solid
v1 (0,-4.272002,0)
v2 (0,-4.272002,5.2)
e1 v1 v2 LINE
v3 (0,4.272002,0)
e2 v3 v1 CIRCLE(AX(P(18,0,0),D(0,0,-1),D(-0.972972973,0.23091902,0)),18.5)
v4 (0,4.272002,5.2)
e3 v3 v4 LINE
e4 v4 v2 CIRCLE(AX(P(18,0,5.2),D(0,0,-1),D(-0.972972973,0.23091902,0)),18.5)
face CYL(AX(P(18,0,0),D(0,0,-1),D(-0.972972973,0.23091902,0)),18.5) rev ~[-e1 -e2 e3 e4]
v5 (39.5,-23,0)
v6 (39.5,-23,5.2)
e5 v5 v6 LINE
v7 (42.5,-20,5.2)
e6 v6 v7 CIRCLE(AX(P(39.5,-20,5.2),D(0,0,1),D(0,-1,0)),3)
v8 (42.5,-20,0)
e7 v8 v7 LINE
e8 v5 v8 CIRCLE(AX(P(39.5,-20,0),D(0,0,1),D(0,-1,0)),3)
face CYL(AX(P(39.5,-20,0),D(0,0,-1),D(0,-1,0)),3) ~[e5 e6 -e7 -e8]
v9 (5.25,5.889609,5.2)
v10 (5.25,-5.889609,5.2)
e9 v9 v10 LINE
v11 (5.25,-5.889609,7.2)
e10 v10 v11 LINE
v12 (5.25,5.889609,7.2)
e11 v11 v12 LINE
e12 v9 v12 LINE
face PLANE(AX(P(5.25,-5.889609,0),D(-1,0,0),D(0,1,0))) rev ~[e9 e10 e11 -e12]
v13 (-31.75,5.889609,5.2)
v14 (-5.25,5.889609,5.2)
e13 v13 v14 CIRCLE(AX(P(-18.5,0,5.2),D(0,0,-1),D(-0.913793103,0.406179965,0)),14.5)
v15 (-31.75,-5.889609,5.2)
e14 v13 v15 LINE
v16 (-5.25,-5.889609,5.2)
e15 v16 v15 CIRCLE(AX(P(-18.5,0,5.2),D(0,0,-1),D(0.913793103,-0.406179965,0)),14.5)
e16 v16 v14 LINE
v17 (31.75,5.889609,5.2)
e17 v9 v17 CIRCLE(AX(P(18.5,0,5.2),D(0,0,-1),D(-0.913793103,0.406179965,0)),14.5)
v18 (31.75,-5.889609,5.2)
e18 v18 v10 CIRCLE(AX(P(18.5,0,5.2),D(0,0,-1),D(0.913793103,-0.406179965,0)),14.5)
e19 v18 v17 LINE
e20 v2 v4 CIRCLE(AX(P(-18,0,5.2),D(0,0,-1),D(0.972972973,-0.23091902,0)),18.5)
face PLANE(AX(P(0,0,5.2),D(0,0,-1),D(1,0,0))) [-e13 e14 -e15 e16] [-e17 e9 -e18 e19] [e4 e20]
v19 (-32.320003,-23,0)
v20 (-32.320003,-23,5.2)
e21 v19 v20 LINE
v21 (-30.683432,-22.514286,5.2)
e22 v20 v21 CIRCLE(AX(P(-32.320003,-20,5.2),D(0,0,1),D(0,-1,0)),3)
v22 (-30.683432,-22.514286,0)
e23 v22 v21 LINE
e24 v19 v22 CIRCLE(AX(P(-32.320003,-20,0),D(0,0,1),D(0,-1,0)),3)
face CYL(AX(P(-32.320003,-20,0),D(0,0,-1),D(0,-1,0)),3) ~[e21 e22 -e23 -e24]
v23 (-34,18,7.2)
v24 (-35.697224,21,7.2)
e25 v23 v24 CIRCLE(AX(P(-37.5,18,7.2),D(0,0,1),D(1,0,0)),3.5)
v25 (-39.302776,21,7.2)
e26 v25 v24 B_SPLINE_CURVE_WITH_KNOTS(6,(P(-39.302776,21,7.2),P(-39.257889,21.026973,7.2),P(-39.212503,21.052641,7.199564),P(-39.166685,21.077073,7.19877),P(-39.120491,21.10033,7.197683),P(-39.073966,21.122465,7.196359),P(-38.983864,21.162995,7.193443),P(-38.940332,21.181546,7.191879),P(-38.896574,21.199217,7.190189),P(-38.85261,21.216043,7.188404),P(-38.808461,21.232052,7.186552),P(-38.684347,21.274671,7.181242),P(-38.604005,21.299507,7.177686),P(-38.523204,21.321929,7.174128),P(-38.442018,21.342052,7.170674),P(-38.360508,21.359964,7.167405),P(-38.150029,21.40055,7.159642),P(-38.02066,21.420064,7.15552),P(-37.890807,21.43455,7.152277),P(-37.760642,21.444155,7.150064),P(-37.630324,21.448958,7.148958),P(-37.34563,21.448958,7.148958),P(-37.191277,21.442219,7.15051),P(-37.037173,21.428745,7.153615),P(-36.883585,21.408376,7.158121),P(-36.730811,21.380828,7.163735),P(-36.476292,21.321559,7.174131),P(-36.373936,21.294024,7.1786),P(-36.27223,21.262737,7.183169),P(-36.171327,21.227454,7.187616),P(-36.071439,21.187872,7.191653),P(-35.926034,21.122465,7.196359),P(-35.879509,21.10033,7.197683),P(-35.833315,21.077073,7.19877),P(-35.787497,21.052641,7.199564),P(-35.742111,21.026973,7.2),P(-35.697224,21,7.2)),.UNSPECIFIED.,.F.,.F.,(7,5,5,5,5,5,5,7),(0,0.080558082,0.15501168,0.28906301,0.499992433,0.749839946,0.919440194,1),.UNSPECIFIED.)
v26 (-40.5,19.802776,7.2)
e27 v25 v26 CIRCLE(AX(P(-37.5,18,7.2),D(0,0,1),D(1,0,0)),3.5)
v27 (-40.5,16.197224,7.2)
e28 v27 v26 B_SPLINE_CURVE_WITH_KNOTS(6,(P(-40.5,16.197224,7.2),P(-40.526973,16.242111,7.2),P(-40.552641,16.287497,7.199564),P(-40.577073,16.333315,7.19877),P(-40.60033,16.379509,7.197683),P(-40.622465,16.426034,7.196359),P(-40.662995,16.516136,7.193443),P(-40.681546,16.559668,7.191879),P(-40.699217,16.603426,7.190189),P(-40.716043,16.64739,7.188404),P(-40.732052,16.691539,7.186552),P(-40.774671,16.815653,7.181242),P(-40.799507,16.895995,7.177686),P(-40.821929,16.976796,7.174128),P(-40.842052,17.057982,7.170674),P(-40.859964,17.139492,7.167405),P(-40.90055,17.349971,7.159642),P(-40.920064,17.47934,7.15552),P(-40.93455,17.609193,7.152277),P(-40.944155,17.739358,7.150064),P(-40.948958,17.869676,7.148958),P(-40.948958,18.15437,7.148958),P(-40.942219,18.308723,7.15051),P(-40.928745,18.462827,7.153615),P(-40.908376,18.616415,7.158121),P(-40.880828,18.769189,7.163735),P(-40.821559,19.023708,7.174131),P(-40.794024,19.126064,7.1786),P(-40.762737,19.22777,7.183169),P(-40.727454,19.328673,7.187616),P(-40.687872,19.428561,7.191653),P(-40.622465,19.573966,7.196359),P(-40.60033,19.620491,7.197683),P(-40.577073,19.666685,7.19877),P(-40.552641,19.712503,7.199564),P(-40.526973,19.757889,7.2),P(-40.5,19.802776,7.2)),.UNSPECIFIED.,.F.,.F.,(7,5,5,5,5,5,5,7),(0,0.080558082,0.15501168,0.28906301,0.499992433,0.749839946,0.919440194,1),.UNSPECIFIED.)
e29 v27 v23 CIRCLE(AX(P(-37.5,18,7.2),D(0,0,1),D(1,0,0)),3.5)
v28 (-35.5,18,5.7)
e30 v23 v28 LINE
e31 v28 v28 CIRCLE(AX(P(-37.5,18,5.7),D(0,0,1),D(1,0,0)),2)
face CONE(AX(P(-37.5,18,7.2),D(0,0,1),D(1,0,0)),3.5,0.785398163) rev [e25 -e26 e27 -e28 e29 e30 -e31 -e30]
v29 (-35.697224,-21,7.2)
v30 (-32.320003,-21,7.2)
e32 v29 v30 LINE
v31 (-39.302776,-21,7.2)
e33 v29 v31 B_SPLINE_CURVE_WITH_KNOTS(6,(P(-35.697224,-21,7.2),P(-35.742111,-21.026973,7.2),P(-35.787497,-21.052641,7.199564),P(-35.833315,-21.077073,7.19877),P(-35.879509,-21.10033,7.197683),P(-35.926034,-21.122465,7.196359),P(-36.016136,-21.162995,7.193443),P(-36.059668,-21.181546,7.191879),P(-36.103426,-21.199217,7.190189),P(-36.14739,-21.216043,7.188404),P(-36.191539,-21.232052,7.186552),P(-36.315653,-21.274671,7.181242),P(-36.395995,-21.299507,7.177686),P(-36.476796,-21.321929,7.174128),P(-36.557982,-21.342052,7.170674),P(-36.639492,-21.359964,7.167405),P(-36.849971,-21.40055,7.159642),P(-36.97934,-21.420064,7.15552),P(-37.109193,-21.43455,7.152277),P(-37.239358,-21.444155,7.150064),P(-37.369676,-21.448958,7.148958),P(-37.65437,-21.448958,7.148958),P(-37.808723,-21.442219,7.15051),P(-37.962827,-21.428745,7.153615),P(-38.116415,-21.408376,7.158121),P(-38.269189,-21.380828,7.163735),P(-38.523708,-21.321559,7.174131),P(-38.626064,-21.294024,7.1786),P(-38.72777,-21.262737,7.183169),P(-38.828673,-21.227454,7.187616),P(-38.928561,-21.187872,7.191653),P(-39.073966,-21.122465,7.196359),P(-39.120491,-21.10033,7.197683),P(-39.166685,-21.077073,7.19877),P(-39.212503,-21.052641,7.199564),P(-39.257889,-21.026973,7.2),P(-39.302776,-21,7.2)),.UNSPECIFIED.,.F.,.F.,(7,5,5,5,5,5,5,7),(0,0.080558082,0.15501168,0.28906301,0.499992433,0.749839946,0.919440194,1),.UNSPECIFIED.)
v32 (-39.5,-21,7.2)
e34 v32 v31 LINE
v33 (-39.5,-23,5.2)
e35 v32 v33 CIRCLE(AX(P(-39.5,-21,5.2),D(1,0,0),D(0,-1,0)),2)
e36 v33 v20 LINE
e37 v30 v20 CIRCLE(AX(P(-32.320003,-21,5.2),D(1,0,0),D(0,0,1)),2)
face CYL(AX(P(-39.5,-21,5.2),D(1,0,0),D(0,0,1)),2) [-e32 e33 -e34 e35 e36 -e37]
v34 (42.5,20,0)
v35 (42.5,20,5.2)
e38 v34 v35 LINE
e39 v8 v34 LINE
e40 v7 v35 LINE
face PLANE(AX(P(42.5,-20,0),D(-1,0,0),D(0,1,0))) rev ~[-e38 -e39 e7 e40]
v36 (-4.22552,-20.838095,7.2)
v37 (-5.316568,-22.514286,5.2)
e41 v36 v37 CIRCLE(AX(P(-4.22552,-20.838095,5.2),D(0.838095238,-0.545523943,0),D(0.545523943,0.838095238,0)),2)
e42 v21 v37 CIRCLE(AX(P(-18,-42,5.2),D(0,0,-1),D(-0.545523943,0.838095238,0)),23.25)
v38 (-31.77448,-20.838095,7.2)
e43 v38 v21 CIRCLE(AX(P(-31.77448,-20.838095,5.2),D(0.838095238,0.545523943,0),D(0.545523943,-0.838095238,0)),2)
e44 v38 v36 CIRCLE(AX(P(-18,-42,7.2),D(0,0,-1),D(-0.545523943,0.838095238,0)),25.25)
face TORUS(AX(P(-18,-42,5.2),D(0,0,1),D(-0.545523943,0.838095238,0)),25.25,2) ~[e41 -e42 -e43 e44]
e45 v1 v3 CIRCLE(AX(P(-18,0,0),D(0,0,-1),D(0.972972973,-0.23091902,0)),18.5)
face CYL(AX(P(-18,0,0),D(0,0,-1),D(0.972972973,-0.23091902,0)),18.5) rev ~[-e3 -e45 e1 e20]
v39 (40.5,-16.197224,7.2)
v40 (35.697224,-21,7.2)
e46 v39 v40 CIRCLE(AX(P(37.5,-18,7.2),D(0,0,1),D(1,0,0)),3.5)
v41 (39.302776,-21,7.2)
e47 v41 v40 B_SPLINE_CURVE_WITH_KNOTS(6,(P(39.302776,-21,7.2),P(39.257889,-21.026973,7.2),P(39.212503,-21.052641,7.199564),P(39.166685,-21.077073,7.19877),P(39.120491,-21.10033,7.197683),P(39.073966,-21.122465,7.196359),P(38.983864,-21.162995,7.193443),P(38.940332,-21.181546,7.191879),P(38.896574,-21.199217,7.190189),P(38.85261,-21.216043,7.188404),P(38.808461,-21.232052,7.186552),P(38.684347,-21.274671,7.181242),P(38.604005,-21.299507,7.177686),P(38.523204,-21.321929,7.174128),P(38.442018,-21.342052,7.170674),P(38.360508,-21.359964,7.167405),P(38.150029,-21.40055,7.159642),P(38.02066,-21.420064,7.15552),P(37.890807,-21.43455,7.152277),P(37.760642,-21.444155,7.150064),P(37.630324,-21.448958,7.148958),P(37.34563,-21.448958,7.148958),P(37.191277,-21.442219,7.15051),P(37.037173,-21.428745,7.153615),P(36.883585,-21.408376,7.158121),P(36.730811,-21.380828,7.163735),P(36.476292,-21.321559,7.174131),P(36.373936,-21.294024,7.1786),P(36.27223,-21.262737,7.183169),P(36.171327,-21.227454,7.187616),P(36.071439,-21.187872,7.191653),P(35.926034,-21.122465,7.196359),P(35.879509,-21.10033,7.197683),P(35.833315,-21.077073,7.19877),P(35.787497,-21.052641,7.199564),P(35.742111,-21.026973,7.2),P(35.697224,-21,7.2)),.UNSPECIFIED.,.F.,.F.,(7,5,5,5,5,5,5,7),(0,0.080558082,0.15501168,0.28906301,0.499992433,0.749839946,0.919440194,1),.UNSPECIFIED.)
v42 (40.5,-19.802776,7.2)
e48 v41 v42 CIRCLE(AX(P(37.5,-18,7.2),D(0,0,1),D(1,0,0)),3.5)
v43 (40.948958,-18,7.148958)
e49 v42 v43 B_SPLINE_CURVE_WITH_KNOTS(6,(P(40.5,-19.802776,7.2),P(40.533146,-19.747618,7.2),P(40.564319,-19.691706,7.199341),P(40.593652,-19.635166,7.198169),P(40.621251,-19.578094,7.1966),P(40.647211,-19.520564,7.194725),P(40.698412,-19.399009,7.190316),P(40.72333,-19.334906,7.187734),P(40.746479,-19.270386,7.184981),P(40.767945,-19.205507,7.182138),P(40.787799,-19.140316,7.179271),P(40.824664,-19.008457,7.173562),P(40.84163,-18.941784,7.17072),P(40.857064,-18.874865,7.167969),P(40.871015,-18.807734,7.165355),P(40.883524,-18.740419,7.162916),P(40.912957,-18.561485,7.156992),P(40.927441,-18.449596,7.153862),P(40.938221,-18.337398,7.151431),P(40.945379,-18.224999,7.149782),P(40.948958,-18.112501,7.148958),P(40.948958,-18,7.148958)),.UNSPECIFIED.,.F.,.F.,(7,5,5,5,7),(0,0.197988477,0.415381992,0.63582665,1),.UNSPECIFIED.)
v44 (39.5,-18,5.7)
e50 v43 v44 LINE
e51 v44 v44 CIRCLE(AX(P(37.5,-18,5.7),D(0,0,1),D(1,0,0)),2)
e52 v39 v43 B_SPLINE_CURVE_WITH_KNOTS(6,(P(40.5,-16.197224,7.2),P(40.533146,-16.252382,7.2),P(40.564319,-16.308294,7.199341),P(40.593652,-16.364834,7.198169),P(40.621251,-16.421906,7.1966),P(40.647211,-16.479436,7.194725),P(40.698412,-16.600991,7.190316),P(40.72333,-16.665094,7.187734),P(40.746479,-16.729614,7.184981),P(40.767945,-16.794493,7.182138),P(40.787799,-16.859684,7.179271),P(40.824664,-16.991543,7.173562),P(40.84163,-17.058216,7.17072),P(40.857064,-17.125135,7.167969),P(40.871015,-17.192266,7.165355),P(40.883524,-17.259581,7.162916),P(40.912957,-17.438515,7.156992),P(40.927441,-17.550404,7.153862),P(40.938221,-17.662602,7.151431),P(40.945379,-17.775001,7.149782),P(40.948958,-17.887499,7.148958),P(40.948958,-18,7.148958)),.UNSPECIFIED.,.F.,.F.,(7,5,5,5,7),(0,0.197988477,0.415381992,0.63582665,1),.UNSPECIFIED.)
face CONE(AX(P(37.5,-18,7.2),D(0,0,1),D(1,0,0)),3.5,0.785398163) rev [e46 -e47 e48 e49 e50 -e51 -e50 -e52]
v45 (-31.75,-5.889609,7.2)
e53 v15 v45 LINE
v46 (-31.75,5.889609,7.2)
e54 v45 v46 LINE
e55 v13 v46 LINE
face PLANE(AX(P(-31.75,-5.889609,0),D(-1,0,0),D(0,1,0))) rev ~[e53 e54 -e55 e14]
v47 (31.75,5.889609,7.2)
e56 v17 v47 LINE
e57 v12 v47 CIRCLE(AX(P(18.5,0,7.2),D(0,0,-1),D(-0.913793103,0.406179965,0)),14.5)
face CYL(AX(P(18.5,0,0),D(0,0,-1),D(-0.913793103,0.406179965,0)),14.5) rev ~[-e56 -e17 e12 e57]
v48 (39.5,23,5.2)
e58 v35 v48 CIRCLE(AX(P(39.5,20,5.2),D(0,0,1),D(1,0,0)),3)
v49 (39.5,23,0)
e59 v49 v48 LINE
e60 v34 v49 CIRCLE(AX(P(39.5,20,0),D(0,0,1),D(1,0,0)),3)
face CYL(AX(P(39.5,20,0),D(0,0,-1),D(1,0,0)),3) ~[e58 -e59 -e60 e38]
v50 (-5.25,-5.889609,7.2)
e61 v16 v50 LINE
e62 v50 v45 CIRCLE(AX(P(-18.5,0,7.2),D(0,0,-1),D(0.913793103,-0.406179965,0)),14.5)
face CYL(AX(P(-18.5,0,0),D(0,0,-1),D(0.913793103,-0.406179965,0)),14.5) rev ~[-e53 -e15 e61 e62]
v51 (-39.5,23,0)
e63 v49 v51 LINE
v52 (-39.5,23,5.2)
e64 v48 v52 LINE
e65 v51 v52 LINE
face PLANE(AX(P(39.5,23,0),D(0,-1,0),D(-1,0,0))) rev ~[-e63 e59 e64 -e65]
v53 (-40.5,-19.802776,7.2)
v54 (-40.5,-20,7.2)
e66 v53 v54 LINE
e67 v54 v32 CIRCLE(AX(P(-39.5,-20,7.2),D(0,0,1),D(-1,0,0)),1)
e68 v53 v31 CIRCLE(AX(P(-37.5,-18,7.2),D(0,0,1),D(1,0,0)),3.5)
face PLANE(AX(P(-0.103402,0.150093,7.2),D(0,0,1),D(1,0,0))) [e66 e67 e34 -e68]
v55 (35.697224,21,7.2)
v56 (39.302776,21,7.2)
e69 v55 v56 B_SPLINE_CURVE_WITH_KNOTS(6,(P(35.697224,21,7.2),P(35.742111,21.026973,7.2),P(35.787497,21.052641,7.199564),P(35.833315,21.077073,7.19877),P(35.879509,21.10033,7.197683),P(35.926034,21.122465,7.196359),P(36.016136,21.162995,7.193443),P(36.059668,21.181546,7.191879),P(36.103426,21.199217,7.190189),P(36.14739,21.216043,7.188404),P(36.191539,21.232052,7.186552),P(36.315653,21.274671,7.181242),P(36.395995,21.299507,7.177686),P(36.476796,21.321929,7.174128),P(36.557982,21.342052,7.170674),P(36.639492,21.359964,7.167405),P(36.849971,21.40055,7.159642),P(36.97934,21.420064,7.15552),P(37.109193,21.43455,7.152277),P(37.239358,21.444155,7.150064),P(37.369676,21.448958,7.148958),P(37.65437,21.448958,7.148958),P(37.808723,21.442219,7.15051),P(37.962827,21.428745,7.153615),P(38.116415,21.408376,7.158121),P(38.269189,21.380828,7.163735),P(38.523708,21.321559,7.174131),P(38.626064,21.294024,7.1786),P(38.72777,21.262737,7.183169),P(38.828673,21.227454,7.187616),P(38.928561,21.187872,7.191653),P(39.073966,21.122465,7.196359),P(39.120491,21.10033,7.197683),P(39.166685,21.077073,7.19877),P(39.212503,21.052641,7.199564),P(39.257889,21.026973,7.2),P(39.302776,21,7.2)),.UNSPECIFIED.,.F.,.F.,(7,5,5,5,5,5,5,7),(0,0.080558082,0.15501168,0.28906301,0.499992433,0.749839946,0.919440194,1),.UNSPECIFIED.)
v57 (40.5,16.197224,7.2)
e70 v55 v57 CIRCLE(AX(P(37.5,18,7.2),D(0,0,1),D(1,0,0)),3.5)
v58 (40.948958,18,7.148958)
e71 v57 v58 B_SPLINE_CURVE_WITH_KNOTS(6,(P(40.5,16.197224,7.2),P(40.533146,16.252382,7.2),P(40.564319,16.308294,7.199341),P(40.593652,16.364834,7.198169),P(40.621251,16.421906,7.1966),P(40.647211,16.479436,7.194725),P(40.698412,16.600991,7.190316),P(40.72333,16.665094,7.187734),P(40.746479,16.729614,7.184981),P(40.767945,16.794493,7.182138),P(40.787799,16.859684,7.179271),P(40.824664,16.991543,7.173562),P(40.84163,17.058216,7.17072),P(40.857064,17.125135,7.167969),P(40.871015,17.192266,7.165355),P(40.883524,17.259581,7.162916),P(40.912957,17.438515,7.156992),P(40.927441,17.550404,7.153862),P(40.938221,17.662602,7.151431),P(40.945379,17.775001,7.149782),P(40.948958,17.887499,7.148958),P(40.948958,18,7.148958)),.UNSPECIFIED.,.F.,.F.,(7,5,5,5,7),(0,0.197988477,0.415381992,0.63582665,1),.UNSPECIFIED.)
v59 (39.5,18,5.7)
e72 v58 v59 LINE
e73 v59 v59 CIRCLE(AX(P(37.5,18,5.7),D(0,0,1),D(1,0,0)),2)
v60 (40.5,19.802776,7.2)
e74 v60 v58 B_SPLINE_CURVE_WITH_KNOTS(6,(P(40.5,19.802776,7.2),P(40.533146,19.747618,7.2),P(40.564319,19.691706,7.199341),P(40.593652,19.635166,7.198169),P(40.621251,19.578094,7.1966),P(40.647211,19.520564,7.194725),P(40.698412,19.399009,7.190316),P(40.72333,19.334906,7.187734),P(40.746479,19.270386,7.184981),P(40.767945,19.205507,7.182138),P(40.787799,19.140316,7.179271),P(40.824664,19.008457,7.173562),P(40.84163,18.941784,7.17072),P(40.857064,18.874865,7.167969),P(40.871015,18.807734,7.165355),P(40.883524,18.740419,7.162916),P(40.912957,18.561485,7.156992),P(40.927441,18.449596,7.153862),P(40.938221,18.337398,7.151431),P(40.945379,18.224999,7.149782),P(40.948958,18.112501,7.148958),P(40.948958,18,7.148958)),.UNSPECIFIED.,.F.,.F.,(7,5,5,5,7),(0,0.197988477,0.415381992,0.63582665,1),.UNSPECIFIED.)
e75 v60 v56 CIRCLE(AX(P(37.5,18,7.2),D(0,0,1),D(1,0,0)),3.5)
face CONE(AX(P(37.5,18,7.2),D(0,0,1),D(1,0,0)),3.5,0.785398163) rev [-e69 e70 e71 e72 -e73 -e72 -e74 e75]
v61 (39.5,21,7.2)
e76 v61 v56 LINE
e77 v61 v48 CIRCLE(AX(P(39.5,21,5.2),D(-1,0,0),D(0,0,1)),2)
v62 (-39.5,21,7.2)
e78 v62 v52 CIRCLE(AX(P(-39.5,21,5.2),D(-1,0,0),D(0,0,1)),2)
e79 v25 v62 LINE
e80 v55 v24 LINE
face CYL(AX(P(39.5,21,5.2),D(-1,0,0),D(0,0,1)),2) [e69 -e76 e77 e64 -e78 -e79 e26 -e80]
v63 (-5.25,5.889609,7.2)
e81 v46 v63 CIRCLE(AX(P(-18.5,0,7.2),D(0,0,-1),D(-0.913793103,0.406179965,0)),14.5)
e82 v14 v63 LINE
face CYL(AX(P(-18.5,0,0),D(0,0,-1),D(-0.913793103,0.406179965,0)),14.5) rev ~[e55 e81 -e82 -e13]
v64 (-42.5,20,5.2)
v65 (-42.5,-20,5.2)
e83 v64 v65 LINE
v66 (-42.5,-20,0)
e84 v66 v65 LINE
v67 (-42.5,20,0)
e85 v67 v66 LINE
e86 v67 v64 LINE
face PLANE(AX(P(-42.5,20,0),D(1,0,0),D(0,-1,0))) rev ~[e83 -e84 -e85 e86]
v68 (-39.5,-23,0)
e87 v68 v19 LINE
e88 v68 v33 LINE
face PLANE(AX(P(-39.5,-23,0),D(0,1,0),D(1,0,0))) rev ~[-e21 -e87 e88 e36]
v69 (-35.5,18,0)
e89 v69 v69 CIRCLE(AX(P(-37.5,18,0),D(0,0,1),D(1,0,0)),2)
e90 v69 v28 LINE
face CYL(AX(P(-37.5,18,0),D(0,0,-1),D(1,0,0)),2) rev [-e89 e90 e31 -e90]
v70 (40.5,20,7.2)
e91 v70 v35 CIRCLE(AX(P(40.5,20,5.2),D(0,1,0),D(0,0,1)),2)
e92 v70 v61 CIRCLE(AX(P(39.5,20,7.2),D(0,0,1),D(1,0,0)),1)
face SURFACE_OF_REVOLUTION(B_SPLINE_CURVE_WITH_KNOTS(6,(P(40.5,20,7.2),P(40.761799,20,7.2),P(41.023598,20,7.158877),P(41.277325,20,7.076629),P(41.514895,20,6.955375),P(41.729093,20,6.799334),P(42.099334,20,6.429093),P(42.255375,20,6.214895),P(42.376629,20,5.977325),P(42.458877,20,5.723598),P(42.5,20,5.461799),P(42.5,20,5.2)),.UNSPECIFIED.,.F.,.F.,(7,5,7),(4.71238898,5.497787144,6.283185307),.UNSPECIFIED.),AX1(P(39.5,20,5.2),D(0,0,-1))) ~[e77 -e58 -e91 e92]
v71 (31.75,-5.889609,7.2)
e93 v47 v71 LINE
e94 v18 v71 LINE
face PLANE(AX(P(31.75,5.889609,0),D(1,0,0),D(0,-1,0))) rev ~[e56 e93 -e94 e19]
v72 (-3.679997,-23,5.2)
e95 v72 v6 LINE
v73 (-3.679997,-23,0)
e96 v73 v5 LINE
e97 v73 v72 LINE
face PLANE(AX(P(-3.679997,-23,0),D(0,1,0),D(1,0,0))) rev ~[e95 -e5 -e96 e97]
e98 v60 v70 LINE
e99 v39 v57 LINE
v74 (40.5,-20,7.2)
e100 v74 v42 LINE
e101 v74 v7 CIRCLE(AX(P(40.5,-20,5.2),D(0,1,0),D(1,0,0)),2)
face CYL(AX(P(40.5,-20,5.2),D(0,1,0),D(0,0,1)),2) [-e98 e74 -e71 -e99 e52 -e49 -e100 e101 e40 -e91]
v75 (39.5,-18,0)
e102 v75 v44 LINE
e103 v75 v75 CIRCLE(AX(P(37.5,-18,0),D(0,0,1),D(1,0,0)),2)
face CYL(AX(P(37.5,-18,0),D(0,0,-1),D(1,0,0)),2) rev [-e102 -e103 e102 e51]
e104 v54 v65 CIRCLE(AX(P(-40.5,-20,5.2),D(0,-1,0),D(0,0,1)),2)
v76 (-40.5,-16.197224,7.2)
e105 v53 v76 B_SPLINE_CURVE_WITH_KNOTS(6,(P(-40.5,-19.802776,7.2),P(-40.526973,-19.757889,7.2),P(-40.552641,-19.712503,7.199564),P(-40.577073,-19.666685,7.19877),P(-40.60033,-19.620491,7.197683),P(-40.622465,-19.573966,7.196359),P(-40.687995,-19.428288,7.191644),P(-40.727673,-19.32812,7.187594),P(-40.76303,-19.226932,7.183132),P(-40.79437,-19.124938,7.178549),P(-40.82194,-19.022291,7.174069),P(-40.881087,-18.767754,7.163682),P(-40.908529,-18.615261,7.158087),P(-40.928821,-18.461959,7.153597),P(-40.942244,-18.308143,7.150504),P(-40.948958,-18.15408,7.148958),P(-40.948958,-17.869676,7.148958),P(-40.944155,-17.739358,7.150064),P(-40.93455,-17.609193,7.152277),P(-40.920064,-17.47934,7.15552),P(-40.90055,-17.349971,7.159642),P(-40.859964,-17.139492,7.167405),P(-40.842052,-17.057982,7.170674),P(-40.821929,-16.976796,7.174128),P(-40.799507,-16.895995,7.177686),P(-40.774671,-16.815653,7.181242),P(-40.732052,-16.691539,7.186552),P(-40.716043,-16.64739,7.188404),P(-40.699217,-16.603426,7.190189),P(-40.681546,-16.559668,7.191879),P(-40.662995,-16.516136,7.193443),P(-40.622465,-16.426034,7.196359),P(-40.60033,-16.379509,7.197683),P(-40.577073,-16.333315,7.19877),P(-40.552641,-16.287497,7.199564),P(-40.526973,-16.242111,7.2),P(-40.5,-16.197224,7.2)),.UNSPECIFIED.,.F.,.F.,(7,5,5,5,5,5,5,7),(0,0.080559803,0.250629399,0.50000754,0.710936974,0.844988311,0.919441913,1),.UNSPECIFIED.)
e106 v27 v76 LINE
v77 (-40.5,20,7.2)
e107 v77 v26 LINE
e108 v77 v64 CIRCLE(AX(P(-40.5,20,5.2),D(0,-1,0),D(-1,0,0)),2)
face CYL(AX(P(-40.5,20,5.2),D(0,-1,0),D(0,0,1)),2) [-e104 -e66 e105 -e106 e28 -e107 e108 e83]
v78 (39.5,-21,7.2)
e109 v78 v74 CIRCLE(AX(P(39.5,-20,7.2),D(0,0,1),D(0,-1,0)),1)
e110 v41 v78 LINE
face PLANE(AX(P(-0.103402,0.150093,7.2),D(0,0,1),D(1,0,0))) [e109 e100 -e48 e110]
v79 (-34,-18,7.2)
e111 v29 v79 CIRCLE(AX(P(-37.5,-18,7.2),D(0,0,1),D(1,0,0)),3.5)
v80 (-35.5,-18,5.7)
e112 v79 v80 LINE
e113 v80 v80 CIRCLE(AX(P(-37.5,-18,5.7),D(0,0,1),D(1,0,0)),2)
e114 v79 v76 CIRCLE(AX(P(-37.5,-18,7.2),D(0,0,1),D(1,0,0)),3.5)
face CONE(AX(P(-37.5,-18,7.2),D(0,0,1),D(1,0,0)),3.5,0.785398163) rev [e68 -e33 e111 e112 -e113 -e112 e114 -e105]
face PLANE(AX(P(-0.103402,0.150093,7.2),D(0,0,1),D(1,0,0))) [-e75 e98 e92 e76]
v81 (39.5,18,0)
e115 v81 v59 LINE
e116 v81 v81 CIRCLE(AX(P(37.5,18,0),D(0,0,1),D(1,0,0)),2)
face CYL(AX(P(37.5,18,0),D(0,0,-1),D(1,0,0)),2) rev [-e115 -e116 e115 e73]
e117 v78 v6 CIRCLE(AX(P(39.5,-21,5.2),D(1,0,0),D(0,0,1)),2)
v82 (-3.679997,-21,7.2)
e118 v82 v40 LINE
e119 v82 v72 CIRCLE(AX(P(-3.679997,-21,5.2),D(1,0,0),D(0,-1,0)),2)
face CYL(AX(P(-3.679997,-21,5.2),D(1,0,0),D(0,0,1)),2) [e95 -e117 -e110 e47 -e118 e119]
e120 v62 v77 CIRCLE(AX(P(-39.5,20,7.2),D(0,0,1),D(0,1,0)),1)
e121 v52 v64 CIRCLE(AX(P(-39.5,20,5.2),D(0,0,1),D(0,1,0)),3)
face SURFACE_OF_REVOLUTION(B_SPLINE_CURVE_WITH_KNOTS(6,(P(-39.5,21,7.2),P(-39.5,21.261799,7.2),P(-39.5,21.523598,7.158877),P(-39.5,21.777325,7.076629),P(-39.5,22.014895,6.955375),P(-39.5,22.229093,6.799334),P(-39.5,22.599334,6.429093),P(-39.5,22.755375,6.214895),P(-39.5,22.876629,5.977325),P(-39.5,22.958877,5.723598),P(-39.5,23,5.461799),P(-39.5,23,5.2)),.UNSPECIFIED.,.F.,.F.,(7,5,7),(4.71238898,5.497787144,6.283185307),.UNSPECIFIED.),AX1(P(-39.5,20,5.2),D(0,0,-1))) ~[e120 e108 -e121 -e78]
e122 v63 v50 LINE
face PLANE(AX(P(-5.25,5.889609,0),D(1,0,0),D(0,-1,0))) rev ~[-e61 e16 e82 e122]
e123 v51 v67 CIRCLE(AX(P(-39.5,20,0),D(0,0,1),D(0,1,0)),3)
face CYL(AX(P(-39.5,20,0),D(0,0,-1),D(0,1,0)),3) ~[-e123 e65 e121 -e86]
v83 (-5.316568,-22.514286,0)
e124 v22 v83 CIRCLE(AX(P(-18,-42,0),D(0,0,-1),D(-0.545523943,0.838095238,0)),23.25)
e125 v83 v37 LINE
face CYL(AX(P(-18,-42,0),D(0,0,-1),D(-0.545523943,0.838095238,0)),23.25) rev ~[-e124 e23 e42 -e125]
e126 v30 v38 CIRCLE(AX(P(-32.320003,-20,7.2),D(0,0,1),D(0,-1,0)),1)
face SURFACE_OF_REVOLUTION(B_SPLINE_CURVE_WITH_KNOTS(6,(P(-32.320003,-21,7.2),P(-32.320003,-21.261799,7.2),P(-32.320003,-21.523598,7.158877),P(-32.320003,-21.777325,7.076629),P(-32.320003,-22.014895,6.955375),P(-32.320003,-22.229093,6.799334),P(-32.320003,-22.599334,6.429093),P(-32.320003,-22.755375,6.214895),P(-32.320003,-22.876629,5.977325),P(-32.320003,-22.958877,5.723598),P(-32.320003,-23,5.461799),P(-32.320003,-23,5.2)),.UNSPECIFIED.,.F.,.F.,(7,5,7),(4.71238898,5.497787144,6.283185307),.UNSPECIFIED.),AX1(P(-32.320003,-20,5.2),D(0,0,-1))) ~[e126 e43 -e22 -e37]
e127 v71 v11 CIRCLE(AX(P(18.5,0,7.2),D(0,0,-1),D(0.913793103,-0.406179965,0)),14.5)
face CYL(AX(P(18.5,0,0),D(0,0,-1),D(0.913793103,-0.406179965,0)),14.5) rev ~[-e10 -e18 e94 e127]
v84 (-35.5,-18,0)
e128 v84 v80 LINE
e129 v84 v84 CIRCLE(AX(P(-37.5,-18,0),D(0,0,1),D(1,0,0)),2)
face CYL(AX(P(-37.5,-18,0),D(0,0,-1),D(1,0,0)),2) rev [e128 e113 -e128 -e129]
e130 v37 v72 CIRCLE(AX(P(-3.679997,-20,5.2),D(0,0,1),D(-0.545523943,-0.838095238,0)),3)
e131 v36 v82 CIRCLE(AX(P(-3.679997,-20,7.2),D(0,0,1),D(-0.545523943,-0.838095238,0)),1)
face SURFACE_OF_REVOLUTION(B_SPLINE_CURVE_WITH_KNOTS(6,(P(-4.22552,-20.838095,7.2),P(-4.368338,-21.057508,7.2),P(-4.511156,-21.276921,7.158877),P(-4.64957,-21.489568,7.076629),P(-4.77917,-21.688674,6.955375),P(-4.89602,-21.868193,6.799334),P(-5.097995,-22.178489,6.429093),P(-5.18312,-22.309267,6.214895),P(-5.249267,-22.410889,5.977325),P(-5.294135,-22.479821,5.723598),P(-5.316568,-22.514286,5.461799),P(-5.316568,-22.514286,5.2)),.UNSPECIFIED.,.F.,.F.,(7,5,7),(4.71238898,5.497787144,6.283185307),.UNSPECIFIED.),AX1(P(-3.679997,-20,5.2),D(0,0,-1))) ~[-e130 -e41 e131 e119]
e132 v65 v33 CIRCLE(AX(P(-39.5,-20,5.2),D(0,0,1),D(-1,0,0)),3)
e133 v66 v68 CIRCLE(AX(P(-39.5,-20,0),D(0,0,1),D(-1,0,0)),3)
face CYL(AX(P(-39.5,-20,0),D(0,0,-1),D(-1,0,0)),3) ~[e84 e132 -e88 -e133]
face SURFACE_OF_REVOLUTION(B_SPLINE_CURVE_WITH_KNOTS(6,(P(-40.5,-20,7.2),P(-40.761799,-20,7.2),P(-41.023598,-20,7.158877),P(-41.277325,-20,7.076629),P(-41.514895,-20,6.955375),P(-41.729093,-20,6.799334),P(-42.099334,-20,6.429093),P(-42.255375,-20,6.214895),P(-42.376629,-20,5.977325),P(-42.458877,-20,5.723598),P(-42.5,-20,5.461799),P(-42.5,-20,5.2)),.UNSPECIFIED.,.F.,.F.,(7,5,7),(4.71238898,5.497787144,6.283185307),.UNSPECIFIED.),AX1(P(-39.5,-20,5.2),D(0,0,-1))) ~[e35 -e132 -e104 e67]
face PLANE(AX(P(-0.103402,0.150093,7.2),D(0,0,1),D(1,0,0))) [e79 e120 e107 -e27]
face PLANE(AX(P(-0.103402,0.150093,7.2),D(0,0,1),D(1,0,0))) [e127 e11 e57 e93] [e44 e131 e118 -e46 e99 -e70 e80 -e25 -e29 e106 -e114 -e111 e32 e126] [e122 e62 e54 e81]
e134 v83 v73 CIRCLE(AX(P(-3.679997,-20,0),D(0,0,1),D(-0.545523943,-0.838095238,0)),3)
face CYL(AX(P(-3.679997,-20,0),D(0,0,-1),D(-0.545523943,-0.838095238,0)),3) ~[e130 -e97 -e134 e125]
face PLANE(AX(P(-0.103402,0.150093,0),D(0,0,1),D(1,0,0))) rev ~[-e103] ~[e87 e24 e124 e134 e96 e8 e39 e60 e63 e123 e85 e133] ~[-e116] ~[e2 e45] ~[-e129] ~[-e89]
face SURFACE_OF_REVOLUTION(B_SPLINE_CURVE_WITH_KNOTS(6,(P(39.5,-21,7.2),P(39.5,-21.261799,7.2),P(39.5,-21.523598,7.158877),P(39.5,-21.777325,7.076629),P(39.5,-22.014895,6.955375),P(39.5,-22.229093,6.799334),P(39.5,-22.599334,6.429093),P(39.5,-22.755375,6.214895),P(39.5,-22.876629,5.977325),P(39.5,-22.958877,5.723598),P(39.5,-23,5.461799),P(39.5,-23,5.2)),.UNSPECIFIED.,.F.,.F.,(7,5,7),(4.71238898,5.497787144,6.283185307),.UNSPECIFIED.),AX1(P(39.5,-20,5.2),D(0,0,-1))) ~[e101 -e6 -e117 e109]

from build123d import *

# Parameters (mm, degrees)
F0_R     = 2
F1_DEPTH = 7.2
F3_DEPTH = 5.2
F4_R     = 2


# Not quite as in the source:
# - a fillet or chamfer that OpenCascade refuses, or shapes differently, is made with other operations: its cross-section is extruded or revolved along the edge and cut away or added
# - a feature names something its author has since deleted; it is built from what else it names


with BuildPart() as f1:
    # F0 (on Top) → F1 (new body)
    with BuildSketch(Plane.XY):
        with BuildLine():
            Line((-3.6799965084, -23), (39.5, -23))
            ThreePointArc((39.5, -23), (41.6213203436, -22.1213203436), (42.5, -20))
            Line((42.5, -20), (42.5, 20))
            ThreePointArc((42.5, 20), (41.6213203436, 22.1213203436), (39.5, 23))
            Line((39.5, 23), (-39.5, 23))
            ThreePointArc((-39.5, 23), (-41.6213203436, 22.1213203436), (-42.5, 20))
            Line((-42.5, 20), (-42.5, 0))
            Line((-42.5, 0), (-42.5, -20))
            ThreePointArc((-42.5, -20), (-41.6213203436, -22.1213203436), (-39.5, -23))
            Line((-39.5, -23), (-32.3200034916, -23))
            ThreePointArc((-32.3200034916, -23), (-31.4664395347, -22.8760091397), (-30.683431664, -22.5142857143))
            ThreePointArc((-30.683431664, -22.5142857143), (-18, -18.75), (-5.316568336, -22.5142857143))
            ThreePointArc((-5.316568336, -22.5142857143), (-4.5335604653, -22.8760091397), (-3.6799965084, -23))
        make_face()
        with Locations((-37.5, -18)):
            Circle(F0_R, mode=Mode.SUBTRACT)
        with Locations((37.5, -18)):
            Circle(F0_R, mode=Mode.SUBTRACT)
        with BuildLine():
            ThreePointArc((-31.75, 5.8896094947), (-18.5, 14.5), (-5.25, 5.8896094947))
            Line((-5.25, 5.8896094947), (-5.25, -5.8896094947))
            ThreePointArc((-5.25, -5.8896094947), (-18.5, -14.5), (-31.75, -5.8896094947))
            Line((-31.75, -5.8896094947), (-31.75, 5.8896094947))
        make_face(mode=Mode.SUBTRACT)
        with Locations((-37.5, 18)):
            Circle(F0_R, mode=Mode.SUBTRACT)
        with BuildLine():
            ThreePointArc((31.75, -5.8896094947), (18.5, -14.5), (5.25, -5.8896094947))
            Line((5.25, -5.8896094947), (5.25, 5.8896094947))
            ThreePointArc((5.25, 5.8896094947), (18.5, 14.5), (31.75, 5.8896094947))
            Line((31.75, 5.8896094947), (31.75, -5.8896094947))
        make_face(mode=Mode.SUBTRACT)
        with Locations((37.5, 18)):
            Circle(F0_R, mode=Mode.SUBTRACT)
    extrude(amount=F1_DEPTH)

    # F2 (on face) → F3 (cut)
    with BuildSketch(Plane(origin=(0, 0, 0), x_dir=(1, 0, 0), z_dir=(0, 0, -1))):
        with BuildLine():
            ThreePointArc((0, 4.2720018727), (-36.5, 0), (0, -4.2720018727))
            ThreePointArc((0, -4.2720018727), (36.5, 0), (0, 4.2720018727))
        make_face()
    extrude(amount=-F3_DEPTH, mode=Mode.SUBTRACT)

    # F4
    f4_edges = [f1.edges().sort_by_distance(p)[0] for p in [
        (0, 23, 7.2),
        (-41.62132, 22.12132, 7.2),
        (-42.5, 0, 7.2),
        (-41.62132, -22.12132, 7.2),
        (-35.910002, -23, 7.2),
        (17.910002, -23, 7.2),
        (41.62132, -22.12132, 7.2),
        (42.5, 0, 7.2),
        (41.62132, 22.12132, 7.2),
        (-18, -18.75, 7.2),
        (-31.46644, -22.876009, 7.2),
        (-4.53356, -22.876009, 7.2),
    ]]
    fillet(f4_edges, radius=F4_R)

    # F5: chamfer of 1.5 on 4 edges, made by hand

    # F5_s1 → F5_t2 (revolve, cut)
    with BuildSketch(Plane.XZ.offset(-18)):
        Polygon((-34, 7.2), (-35.5, 5.7), (-35.5, 7.2), align=None)
    revolve(axis=Axis((-37.5, 18, 7.2), (0, 0, 1)), mode=Mode.SUBTRACT)

    # F5_s3 → F5_t4 (revolve, cut)
    with BuildSketch(Plane.XZ.offset(18)):
        Polygon((-34, 7.2), (-35.5, 5.7), (-35.5, 7.2), align=None)
    revolve(axis=Axis((-37.5, -18, 7.2), (0, 0, 1)), mode=Mode.SUBTRACT)

    # F5_s5 → F5_t6 (revolve, cut)
    with BuildSketch(Plane.XZ.offset(18)):
        Polygon((41, 7.2), (39.5, 5.7), (39.5, 7.2), align=None)
    revolve(axis=Axis((37.5, -18, 7.2), (0, 0, 1)), mode=Mode.SUBTRACT)

    # F5_s7 → F5_t8 (revolve, cut)
    with BuildSketch(Plane.XZ.offset(-18)):
        Polygon((41, 7.2), (39.5, 5.7), (39.5, 7.2), align=None)
    revolve(axis=Axis((37.5, 18, 7.2), (0, 0, 1)), mode=Mode.SUBTRACT)


solid = f1.part
